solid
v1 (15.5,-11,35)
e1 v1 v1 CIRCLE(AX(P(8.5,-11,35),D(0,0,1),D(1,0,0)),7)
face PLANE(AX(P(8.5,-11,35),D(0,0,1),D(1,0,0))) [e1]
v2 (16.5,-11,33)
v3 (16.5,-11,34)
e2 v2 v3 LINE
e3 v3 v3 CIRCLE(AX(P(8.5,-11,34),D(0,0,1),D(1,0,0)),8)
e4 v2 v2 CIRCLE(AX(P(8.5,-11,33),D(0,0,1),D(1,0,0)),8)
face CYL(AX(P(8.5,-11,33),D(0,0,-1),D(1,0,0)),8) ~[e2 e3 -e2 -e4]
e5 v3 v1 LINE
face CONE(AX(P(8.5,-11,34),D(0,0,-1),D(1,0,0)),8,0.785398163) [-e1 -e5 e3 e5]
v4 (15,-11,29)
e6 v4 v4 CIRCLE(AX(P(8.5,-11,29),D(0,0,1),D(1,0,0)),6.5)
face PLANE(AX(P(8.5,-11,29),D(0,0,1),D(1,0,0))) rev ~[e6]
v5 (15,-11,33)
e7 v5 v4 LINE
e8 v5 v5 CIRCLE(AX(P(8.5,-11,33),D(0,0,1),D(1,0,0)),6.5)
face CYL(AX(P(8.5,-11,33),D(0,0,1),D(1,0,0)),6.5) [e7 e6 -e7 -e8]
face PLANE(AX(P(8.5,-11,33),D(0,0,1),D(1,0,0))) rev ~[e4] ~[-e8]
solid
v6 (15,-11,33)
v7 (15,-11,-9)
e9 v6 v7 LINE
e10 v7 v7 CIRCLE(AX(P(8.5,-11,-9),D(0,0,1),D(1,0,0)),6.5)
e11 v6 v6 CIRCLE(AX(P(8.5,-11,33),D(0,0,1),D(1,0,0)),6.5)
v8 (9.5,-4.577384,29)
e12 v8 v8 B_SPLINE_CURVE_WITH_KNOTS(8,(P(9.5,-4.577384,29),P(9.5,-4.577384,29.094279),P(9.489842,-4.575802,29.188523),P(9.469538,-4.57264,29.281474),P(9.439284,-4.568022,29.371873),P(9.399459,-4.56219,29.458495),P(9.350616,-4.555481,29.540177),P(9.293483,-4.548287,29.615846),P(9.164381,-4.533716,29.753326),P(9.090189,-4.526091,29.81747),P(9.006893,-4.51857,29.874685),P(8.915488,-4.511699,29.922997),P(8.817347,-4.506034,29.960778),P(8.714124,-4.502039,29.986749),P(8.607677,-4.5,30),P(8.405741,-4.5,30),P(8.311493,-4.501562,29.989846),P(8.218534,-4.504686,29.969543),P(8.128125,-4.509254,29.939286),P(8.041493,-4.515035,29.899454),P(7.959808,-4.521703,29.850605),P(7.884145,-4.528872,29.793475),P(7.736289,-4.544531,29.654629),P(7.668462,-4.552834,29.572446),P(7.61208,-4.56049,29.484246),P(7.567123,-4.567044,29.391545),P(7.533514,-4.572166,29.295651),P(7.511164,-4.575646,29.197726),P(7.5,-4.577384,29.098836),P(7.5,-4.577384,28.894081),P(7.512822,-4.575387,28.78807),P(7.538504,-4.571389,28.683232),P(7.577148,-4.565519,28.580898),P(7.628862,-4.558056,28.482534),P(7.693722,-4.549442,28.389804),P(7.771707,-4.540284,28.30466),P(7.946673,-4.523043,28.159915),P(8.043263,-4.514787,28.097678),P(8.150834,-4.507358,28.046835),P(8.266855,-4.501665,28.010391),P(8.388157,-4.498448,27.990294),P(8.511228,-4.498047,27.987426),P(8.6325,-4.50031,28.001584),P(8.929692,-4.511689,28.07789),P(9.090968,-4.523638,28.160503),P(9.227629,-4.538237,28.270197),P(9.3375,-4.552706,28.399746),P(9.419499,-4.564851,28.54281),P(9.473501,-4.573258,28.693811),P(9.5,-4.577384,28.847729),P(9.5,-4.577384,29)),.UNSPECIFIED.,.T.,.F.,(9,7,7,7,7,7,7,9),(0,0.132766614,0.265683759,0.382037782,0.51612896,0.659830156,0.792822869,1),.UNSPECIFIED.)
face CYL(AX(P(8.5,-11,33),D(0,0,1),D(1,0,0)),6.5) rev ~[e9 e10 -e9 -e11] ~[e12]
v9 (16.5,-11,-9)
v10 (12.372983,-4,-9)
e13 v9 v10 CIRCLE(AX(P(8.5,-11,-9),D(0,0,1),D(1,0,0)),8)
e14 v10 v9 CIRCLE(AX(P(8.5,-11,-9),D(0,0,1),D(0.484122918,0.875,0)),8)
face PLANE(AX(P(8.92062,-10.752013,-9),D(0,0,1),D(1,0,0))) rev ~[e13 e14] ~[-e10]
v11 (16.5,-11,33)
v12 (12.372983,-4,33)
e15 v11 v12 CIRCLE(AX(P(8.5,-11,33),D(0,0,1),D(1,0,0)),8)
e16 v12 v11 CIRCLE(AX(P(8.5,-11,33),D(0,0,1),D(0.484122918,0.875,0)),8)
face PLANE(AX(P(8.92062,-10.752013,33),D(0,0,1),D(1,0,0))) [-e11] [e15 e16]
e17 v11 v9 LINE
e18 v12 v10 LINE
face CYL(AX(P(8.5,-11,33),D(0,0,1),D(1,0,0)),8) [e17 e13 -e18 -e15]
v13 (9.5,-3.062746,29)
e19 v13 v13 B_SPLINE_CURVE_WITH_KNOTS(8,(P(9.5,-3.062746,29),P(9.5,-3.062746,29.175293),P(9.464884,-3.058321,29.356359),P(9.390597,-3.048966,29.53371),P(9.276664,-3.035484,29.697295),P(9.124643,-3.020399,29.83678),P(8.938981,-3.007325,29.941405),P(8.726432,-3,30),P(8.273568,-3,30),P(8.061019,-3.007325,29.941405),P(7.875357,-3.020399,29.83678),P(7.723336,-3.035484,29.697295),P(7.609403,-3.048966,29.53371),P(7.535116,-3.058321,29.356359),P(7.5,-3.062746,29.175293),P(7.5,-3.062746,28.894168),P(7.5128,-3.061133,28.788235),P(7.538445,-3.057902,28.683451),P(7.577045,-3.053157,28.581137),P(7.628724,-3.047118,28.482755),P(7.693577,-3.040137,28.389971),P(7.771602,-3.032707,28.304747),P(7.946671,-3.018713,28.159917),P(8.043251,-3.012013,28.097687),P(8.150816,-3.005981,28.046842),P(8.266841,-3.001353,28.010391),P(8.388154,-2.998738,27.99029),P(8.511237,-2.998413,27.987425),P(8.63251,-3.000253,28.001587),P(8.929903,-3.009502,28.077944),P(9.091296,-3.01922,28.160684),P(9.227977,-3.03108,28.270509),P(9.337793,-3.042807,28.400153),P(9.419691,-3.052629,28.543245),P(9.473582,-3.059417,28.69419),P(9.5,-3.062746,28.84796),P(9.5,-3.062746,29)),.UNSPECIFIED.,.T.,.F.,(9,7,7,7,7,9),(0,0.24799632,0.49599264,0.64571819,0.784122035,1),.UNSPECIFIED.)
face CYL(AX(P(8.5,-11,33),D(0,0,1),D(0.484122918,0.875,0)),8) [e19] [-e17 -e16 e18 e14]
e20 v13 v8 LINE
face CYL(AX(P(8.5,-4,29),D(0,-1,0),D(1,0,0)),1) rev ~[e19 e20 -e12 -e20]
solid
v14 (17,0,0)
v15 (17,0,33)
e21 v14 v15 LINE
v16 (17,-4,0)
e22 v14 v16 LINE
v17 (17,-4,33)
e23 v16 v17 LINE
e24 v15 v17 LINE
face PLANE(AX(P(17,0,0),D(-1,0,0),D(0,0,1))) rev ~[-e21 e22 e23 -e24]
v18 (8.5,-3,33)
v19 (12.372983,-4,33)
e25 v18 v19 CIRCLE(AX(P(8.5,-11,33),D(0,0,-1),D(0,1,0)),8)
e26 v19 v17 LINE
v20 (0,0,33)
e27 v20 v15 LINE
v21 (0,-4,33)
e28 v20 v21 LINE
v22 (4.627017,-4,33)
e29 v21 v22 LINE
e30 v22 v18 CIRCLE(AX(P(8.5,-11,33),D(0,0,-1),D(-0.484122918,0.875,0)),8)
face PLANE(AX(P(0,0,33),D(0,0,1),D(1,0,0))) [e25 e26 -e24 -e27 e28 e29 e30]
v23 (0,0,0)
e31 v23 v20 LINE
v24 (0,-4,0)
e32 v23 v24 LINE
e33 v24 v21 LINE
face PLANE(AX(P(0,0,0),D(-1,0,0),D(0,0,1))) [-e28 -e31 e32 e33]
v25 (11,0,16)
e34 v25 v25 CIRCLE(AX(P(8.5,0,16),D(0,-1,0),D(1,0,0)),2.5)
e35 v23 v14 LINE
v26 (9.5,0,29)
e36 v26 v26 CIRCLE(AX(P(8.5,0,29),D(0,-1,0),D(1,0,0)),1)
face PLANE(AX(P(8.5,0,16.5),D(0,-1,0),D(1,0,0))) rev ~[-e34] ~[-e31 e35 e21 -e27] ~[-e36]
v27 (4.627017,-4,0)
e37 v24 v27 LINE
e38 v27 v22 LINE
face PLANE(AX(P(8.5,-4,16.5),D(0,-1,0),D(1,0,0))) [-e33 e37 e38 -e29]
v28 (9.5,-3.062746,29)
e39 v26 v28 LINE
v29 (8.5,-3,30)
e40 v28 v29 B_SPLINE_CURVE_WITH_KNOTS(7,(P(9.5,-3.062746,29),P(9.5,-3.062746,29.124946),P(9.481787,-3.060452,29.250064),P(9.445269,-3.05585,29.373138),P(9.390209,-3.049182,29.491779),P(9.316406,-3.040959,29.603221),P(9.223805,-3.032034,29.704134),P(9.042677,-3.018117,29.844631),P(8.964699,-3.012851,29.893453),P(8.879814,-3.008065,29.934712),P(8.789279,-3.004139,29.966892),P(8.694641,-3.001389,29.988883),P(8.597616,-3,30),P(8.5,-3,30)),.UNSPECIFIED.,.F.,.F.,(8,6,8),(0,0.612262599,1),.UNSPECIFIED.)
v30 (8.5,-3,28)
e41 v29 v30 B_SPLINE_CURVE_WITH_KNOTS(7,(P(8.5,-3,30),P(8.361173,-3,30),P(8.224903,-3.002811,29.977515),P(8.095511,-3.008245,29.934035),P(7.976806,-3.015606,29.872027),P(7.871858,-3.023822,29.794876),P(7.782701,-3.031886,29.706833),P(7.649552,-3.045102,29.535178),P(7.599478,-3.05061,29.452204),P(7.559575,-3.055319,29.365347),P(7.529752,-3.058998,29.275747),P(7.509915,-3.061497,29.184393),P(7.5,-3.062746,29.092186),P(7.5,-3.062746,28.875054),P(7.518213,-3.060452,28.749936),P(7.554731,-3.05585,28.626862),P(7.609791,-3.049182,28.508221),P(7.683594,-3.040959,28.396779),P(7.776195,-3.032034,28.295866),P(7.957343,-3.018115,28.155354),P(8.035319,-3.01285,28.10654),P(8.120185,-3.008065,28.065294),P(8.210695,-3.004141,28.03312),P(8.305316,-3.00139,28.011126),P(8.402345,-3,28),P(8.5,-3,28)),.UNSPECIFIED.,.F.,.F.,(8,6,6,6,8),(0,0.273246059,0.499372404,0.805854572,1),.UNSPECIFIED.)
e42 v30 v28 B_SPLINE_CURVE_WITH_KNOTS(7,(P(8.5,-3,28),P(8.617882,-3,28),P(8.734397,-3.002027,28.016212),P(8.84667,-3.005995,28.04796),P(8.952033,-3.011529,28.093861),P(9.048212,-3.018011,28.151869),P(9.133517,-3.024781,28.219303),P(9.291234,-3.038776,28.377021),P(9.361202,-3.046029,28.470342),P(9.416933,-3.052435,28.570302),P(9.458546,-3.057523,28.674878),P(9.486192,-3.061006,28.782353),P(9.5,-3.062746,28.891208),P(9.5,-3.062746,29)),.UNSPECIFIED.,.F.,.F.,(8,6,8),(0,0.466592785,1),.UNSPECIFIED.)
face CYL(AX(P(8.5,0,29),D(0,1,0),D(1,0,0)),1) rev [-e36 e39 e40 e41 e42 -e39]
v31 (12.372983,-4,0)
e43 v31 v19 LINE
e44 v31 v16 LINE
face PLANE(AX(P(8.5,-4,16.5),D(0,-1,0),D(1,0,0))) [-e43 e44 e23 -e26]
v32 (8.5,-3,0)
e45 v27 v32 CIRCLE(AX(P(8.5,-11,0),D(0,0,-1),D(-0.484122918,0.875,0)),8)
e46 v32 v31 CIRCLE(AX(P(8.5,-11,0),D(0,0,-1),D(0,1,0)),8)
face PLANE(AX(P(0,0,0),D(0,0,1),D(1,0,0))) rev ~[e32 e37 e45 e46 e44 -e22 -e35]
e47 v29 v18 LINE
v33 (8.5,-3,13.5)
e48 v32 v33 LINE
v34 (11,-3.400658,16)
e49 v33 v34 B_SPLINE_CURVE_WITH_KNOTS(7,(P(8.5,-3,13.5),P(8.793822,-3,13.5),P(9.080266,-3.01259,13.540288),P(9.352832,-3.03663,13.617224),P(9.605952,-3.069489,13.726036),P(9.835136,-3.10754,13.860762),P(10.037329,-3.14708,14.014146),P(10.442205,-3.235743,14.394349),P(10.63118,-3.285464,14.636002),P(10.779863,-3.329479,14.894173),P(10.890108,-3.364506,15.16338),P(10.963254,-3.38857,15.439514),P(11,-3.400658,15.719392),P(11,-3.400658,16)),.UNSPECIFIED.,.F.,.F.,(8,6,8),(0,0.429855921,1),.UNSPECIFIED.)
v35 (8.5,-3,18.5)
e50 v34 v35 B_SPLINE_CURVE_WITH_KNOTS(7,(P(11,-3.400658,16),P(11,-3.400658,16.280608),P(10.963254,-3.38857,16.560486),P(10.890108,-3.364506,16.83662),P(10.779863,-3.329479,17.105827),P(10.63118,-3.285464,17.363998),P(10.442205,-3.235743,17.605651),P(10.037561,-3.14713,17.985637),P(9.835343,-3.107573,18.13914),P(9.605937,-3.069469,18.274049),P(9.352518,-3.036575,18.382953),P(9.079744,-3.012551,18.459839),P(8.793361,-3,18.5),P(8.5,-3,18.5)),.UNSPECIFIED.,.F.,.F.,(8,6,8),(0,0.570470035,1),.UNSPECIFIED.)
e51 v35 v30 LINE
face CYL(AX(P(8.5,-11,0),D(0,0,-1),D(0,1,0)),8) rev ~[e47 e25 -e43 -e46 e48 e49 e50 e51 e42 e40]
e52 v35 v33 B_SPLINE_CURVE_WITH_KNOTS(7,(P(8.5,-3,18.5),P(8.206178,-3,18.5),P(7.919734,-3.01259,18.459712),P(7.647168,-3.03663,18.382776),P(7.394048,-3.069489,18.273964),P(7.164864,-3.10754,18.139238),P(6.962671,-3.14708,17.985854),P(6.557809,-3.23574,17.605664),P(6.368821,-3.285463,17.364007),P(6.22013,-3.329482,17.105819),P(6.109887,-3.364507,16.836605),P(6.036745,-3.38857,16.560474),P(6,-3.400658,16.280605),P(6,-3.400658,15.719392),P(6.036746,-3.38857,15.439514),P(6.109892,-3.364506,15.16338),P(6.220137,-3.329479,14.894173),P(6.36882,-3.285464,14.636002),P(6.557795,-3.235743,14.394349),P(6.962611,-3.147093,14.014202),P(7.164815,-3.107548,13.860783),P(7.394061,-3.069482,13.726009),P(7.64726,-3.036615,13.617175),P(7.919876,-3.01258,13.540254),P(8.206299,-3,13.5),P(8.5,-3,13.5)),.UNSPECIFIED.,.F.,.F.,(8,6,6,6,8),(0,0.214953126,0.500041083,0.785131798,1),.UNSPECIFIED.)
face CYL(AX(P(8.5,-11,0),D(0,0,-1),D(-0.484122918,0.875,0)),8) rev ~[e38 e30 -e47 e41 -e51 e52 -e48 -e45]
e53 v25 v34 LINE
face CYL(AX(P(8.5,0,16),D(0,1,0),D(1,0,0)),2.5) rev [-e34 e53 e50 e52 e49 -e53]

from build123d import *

# Parameters (mm, degrees)
F0_W      = 17
F0_H      = 33
F0_R      = 2.5
F0_R_2    = 1
F1_DEPTH  = 4
F3_DEPTH  = 33
F4_R      = 6.5
F5_DEPTH  = 42
F6_R      = 1
F7_DEPTH  = 1
F8_R      = 6.5
F9_DEPTH  = 4
F8_R_2    = 8
F10_DEPTH = 2
F11_SIZE  = 1


with BuildPart() as f1:
    # F0 (on Front) → F1 (new body)
    with BuildSketch(Plane.XZ):
        with Locations((8.5, 16.5)):
            Rectangle(F0_W, F0_H)
        with Locations((8.5, 16)):
            Circle(F0_R, mode=Mode.SUBTRACT)
        with Locations((8.5, 29)):
            Circle(F0_R_2, mode=Mode.SUBTRACT)
    extrude(amount=F1_DEPTH)

    # F2 (on face) → F3 (cut, through all)
    with BuildSketch(Plane(origin=(0, 0, 0), x_dir=(1, 0, 0), z_dir=(0, 0, -1))):
        with BuildLine():
            ThreePointArc((4.6270166538, 4), (6.5, 3.2540333076), (8.5, 3))
            ThreePointArc((8.5, 3), (10.5, 3.2540333076), (12.3729833462, 4))
            Line((12.3729833462, 4), (4.6270166538, 4))
        make_face()
    extrude(amount=-F3_DEPTH, mode=Mode.SUBTRACT)


with BuildPart() as f5:
    # F4 (on face) → F5 (new body)
    with BuildSketch(Plane.XY.offset(33)):
        with BuildLine():
            ThreePointArc((12.3729833462, -4), (8.5, -3), (4.6270166538, -4))
            ThreePointArc((4.6270166538, -4), (4.4369879873, -17.8914391374), (16.5, -11))
            ThreePointArc((16.5, -11), (15.3914391374, -6.9369879873), (12.3729833462, -4))
        make_face()
        with Locations((8.5, -11)):
            Circle(F4_R, mode=Mode.SUBTRACT)
    extrude(amount=-F5_DEPTH)

    # F6 (on face) → F7 (cut, symmetric)
    with BuildSketch(Plane.XZ.offset(4)):
        with Locations((8.5, 29)):
            Circle(F6_R)
    extrude(amount=F7_DEPTH, both=True, mode=Mode.SUBTRACT)


with BuildPart() as f9:
    # F8 (on face) → F9 (new body)
    with BuildSketch(Plane.XY.offset(33)):
        with Locations((8.5, -11)):
            Circle(F8_R)
    extrude(amount=-F9_DEPTH)

    # F8 (on face) → F10 (join)
    with BuildSketch(Plane.XY.offset(33)):
        with Locations((8.5, -11)):
            Circle(F8_R_2)
        with Locations((8.5, -11)):
            Circle(F8_R, mode=Mode.SUBTRACT)
        with Locations((8.5, -11)):
            Circle(F8_R)
    extrude(amount=F10_DEPTH)

    # F11
    f11_edges = [f9.edges().sort_by_distance(p)[0] for p in [
        (0.5, -11, 35),
    ]]
    chamfer(f11_edges, length=F11_SIZE)


solid = Compound([f1.part, f5.part, f9.part])
